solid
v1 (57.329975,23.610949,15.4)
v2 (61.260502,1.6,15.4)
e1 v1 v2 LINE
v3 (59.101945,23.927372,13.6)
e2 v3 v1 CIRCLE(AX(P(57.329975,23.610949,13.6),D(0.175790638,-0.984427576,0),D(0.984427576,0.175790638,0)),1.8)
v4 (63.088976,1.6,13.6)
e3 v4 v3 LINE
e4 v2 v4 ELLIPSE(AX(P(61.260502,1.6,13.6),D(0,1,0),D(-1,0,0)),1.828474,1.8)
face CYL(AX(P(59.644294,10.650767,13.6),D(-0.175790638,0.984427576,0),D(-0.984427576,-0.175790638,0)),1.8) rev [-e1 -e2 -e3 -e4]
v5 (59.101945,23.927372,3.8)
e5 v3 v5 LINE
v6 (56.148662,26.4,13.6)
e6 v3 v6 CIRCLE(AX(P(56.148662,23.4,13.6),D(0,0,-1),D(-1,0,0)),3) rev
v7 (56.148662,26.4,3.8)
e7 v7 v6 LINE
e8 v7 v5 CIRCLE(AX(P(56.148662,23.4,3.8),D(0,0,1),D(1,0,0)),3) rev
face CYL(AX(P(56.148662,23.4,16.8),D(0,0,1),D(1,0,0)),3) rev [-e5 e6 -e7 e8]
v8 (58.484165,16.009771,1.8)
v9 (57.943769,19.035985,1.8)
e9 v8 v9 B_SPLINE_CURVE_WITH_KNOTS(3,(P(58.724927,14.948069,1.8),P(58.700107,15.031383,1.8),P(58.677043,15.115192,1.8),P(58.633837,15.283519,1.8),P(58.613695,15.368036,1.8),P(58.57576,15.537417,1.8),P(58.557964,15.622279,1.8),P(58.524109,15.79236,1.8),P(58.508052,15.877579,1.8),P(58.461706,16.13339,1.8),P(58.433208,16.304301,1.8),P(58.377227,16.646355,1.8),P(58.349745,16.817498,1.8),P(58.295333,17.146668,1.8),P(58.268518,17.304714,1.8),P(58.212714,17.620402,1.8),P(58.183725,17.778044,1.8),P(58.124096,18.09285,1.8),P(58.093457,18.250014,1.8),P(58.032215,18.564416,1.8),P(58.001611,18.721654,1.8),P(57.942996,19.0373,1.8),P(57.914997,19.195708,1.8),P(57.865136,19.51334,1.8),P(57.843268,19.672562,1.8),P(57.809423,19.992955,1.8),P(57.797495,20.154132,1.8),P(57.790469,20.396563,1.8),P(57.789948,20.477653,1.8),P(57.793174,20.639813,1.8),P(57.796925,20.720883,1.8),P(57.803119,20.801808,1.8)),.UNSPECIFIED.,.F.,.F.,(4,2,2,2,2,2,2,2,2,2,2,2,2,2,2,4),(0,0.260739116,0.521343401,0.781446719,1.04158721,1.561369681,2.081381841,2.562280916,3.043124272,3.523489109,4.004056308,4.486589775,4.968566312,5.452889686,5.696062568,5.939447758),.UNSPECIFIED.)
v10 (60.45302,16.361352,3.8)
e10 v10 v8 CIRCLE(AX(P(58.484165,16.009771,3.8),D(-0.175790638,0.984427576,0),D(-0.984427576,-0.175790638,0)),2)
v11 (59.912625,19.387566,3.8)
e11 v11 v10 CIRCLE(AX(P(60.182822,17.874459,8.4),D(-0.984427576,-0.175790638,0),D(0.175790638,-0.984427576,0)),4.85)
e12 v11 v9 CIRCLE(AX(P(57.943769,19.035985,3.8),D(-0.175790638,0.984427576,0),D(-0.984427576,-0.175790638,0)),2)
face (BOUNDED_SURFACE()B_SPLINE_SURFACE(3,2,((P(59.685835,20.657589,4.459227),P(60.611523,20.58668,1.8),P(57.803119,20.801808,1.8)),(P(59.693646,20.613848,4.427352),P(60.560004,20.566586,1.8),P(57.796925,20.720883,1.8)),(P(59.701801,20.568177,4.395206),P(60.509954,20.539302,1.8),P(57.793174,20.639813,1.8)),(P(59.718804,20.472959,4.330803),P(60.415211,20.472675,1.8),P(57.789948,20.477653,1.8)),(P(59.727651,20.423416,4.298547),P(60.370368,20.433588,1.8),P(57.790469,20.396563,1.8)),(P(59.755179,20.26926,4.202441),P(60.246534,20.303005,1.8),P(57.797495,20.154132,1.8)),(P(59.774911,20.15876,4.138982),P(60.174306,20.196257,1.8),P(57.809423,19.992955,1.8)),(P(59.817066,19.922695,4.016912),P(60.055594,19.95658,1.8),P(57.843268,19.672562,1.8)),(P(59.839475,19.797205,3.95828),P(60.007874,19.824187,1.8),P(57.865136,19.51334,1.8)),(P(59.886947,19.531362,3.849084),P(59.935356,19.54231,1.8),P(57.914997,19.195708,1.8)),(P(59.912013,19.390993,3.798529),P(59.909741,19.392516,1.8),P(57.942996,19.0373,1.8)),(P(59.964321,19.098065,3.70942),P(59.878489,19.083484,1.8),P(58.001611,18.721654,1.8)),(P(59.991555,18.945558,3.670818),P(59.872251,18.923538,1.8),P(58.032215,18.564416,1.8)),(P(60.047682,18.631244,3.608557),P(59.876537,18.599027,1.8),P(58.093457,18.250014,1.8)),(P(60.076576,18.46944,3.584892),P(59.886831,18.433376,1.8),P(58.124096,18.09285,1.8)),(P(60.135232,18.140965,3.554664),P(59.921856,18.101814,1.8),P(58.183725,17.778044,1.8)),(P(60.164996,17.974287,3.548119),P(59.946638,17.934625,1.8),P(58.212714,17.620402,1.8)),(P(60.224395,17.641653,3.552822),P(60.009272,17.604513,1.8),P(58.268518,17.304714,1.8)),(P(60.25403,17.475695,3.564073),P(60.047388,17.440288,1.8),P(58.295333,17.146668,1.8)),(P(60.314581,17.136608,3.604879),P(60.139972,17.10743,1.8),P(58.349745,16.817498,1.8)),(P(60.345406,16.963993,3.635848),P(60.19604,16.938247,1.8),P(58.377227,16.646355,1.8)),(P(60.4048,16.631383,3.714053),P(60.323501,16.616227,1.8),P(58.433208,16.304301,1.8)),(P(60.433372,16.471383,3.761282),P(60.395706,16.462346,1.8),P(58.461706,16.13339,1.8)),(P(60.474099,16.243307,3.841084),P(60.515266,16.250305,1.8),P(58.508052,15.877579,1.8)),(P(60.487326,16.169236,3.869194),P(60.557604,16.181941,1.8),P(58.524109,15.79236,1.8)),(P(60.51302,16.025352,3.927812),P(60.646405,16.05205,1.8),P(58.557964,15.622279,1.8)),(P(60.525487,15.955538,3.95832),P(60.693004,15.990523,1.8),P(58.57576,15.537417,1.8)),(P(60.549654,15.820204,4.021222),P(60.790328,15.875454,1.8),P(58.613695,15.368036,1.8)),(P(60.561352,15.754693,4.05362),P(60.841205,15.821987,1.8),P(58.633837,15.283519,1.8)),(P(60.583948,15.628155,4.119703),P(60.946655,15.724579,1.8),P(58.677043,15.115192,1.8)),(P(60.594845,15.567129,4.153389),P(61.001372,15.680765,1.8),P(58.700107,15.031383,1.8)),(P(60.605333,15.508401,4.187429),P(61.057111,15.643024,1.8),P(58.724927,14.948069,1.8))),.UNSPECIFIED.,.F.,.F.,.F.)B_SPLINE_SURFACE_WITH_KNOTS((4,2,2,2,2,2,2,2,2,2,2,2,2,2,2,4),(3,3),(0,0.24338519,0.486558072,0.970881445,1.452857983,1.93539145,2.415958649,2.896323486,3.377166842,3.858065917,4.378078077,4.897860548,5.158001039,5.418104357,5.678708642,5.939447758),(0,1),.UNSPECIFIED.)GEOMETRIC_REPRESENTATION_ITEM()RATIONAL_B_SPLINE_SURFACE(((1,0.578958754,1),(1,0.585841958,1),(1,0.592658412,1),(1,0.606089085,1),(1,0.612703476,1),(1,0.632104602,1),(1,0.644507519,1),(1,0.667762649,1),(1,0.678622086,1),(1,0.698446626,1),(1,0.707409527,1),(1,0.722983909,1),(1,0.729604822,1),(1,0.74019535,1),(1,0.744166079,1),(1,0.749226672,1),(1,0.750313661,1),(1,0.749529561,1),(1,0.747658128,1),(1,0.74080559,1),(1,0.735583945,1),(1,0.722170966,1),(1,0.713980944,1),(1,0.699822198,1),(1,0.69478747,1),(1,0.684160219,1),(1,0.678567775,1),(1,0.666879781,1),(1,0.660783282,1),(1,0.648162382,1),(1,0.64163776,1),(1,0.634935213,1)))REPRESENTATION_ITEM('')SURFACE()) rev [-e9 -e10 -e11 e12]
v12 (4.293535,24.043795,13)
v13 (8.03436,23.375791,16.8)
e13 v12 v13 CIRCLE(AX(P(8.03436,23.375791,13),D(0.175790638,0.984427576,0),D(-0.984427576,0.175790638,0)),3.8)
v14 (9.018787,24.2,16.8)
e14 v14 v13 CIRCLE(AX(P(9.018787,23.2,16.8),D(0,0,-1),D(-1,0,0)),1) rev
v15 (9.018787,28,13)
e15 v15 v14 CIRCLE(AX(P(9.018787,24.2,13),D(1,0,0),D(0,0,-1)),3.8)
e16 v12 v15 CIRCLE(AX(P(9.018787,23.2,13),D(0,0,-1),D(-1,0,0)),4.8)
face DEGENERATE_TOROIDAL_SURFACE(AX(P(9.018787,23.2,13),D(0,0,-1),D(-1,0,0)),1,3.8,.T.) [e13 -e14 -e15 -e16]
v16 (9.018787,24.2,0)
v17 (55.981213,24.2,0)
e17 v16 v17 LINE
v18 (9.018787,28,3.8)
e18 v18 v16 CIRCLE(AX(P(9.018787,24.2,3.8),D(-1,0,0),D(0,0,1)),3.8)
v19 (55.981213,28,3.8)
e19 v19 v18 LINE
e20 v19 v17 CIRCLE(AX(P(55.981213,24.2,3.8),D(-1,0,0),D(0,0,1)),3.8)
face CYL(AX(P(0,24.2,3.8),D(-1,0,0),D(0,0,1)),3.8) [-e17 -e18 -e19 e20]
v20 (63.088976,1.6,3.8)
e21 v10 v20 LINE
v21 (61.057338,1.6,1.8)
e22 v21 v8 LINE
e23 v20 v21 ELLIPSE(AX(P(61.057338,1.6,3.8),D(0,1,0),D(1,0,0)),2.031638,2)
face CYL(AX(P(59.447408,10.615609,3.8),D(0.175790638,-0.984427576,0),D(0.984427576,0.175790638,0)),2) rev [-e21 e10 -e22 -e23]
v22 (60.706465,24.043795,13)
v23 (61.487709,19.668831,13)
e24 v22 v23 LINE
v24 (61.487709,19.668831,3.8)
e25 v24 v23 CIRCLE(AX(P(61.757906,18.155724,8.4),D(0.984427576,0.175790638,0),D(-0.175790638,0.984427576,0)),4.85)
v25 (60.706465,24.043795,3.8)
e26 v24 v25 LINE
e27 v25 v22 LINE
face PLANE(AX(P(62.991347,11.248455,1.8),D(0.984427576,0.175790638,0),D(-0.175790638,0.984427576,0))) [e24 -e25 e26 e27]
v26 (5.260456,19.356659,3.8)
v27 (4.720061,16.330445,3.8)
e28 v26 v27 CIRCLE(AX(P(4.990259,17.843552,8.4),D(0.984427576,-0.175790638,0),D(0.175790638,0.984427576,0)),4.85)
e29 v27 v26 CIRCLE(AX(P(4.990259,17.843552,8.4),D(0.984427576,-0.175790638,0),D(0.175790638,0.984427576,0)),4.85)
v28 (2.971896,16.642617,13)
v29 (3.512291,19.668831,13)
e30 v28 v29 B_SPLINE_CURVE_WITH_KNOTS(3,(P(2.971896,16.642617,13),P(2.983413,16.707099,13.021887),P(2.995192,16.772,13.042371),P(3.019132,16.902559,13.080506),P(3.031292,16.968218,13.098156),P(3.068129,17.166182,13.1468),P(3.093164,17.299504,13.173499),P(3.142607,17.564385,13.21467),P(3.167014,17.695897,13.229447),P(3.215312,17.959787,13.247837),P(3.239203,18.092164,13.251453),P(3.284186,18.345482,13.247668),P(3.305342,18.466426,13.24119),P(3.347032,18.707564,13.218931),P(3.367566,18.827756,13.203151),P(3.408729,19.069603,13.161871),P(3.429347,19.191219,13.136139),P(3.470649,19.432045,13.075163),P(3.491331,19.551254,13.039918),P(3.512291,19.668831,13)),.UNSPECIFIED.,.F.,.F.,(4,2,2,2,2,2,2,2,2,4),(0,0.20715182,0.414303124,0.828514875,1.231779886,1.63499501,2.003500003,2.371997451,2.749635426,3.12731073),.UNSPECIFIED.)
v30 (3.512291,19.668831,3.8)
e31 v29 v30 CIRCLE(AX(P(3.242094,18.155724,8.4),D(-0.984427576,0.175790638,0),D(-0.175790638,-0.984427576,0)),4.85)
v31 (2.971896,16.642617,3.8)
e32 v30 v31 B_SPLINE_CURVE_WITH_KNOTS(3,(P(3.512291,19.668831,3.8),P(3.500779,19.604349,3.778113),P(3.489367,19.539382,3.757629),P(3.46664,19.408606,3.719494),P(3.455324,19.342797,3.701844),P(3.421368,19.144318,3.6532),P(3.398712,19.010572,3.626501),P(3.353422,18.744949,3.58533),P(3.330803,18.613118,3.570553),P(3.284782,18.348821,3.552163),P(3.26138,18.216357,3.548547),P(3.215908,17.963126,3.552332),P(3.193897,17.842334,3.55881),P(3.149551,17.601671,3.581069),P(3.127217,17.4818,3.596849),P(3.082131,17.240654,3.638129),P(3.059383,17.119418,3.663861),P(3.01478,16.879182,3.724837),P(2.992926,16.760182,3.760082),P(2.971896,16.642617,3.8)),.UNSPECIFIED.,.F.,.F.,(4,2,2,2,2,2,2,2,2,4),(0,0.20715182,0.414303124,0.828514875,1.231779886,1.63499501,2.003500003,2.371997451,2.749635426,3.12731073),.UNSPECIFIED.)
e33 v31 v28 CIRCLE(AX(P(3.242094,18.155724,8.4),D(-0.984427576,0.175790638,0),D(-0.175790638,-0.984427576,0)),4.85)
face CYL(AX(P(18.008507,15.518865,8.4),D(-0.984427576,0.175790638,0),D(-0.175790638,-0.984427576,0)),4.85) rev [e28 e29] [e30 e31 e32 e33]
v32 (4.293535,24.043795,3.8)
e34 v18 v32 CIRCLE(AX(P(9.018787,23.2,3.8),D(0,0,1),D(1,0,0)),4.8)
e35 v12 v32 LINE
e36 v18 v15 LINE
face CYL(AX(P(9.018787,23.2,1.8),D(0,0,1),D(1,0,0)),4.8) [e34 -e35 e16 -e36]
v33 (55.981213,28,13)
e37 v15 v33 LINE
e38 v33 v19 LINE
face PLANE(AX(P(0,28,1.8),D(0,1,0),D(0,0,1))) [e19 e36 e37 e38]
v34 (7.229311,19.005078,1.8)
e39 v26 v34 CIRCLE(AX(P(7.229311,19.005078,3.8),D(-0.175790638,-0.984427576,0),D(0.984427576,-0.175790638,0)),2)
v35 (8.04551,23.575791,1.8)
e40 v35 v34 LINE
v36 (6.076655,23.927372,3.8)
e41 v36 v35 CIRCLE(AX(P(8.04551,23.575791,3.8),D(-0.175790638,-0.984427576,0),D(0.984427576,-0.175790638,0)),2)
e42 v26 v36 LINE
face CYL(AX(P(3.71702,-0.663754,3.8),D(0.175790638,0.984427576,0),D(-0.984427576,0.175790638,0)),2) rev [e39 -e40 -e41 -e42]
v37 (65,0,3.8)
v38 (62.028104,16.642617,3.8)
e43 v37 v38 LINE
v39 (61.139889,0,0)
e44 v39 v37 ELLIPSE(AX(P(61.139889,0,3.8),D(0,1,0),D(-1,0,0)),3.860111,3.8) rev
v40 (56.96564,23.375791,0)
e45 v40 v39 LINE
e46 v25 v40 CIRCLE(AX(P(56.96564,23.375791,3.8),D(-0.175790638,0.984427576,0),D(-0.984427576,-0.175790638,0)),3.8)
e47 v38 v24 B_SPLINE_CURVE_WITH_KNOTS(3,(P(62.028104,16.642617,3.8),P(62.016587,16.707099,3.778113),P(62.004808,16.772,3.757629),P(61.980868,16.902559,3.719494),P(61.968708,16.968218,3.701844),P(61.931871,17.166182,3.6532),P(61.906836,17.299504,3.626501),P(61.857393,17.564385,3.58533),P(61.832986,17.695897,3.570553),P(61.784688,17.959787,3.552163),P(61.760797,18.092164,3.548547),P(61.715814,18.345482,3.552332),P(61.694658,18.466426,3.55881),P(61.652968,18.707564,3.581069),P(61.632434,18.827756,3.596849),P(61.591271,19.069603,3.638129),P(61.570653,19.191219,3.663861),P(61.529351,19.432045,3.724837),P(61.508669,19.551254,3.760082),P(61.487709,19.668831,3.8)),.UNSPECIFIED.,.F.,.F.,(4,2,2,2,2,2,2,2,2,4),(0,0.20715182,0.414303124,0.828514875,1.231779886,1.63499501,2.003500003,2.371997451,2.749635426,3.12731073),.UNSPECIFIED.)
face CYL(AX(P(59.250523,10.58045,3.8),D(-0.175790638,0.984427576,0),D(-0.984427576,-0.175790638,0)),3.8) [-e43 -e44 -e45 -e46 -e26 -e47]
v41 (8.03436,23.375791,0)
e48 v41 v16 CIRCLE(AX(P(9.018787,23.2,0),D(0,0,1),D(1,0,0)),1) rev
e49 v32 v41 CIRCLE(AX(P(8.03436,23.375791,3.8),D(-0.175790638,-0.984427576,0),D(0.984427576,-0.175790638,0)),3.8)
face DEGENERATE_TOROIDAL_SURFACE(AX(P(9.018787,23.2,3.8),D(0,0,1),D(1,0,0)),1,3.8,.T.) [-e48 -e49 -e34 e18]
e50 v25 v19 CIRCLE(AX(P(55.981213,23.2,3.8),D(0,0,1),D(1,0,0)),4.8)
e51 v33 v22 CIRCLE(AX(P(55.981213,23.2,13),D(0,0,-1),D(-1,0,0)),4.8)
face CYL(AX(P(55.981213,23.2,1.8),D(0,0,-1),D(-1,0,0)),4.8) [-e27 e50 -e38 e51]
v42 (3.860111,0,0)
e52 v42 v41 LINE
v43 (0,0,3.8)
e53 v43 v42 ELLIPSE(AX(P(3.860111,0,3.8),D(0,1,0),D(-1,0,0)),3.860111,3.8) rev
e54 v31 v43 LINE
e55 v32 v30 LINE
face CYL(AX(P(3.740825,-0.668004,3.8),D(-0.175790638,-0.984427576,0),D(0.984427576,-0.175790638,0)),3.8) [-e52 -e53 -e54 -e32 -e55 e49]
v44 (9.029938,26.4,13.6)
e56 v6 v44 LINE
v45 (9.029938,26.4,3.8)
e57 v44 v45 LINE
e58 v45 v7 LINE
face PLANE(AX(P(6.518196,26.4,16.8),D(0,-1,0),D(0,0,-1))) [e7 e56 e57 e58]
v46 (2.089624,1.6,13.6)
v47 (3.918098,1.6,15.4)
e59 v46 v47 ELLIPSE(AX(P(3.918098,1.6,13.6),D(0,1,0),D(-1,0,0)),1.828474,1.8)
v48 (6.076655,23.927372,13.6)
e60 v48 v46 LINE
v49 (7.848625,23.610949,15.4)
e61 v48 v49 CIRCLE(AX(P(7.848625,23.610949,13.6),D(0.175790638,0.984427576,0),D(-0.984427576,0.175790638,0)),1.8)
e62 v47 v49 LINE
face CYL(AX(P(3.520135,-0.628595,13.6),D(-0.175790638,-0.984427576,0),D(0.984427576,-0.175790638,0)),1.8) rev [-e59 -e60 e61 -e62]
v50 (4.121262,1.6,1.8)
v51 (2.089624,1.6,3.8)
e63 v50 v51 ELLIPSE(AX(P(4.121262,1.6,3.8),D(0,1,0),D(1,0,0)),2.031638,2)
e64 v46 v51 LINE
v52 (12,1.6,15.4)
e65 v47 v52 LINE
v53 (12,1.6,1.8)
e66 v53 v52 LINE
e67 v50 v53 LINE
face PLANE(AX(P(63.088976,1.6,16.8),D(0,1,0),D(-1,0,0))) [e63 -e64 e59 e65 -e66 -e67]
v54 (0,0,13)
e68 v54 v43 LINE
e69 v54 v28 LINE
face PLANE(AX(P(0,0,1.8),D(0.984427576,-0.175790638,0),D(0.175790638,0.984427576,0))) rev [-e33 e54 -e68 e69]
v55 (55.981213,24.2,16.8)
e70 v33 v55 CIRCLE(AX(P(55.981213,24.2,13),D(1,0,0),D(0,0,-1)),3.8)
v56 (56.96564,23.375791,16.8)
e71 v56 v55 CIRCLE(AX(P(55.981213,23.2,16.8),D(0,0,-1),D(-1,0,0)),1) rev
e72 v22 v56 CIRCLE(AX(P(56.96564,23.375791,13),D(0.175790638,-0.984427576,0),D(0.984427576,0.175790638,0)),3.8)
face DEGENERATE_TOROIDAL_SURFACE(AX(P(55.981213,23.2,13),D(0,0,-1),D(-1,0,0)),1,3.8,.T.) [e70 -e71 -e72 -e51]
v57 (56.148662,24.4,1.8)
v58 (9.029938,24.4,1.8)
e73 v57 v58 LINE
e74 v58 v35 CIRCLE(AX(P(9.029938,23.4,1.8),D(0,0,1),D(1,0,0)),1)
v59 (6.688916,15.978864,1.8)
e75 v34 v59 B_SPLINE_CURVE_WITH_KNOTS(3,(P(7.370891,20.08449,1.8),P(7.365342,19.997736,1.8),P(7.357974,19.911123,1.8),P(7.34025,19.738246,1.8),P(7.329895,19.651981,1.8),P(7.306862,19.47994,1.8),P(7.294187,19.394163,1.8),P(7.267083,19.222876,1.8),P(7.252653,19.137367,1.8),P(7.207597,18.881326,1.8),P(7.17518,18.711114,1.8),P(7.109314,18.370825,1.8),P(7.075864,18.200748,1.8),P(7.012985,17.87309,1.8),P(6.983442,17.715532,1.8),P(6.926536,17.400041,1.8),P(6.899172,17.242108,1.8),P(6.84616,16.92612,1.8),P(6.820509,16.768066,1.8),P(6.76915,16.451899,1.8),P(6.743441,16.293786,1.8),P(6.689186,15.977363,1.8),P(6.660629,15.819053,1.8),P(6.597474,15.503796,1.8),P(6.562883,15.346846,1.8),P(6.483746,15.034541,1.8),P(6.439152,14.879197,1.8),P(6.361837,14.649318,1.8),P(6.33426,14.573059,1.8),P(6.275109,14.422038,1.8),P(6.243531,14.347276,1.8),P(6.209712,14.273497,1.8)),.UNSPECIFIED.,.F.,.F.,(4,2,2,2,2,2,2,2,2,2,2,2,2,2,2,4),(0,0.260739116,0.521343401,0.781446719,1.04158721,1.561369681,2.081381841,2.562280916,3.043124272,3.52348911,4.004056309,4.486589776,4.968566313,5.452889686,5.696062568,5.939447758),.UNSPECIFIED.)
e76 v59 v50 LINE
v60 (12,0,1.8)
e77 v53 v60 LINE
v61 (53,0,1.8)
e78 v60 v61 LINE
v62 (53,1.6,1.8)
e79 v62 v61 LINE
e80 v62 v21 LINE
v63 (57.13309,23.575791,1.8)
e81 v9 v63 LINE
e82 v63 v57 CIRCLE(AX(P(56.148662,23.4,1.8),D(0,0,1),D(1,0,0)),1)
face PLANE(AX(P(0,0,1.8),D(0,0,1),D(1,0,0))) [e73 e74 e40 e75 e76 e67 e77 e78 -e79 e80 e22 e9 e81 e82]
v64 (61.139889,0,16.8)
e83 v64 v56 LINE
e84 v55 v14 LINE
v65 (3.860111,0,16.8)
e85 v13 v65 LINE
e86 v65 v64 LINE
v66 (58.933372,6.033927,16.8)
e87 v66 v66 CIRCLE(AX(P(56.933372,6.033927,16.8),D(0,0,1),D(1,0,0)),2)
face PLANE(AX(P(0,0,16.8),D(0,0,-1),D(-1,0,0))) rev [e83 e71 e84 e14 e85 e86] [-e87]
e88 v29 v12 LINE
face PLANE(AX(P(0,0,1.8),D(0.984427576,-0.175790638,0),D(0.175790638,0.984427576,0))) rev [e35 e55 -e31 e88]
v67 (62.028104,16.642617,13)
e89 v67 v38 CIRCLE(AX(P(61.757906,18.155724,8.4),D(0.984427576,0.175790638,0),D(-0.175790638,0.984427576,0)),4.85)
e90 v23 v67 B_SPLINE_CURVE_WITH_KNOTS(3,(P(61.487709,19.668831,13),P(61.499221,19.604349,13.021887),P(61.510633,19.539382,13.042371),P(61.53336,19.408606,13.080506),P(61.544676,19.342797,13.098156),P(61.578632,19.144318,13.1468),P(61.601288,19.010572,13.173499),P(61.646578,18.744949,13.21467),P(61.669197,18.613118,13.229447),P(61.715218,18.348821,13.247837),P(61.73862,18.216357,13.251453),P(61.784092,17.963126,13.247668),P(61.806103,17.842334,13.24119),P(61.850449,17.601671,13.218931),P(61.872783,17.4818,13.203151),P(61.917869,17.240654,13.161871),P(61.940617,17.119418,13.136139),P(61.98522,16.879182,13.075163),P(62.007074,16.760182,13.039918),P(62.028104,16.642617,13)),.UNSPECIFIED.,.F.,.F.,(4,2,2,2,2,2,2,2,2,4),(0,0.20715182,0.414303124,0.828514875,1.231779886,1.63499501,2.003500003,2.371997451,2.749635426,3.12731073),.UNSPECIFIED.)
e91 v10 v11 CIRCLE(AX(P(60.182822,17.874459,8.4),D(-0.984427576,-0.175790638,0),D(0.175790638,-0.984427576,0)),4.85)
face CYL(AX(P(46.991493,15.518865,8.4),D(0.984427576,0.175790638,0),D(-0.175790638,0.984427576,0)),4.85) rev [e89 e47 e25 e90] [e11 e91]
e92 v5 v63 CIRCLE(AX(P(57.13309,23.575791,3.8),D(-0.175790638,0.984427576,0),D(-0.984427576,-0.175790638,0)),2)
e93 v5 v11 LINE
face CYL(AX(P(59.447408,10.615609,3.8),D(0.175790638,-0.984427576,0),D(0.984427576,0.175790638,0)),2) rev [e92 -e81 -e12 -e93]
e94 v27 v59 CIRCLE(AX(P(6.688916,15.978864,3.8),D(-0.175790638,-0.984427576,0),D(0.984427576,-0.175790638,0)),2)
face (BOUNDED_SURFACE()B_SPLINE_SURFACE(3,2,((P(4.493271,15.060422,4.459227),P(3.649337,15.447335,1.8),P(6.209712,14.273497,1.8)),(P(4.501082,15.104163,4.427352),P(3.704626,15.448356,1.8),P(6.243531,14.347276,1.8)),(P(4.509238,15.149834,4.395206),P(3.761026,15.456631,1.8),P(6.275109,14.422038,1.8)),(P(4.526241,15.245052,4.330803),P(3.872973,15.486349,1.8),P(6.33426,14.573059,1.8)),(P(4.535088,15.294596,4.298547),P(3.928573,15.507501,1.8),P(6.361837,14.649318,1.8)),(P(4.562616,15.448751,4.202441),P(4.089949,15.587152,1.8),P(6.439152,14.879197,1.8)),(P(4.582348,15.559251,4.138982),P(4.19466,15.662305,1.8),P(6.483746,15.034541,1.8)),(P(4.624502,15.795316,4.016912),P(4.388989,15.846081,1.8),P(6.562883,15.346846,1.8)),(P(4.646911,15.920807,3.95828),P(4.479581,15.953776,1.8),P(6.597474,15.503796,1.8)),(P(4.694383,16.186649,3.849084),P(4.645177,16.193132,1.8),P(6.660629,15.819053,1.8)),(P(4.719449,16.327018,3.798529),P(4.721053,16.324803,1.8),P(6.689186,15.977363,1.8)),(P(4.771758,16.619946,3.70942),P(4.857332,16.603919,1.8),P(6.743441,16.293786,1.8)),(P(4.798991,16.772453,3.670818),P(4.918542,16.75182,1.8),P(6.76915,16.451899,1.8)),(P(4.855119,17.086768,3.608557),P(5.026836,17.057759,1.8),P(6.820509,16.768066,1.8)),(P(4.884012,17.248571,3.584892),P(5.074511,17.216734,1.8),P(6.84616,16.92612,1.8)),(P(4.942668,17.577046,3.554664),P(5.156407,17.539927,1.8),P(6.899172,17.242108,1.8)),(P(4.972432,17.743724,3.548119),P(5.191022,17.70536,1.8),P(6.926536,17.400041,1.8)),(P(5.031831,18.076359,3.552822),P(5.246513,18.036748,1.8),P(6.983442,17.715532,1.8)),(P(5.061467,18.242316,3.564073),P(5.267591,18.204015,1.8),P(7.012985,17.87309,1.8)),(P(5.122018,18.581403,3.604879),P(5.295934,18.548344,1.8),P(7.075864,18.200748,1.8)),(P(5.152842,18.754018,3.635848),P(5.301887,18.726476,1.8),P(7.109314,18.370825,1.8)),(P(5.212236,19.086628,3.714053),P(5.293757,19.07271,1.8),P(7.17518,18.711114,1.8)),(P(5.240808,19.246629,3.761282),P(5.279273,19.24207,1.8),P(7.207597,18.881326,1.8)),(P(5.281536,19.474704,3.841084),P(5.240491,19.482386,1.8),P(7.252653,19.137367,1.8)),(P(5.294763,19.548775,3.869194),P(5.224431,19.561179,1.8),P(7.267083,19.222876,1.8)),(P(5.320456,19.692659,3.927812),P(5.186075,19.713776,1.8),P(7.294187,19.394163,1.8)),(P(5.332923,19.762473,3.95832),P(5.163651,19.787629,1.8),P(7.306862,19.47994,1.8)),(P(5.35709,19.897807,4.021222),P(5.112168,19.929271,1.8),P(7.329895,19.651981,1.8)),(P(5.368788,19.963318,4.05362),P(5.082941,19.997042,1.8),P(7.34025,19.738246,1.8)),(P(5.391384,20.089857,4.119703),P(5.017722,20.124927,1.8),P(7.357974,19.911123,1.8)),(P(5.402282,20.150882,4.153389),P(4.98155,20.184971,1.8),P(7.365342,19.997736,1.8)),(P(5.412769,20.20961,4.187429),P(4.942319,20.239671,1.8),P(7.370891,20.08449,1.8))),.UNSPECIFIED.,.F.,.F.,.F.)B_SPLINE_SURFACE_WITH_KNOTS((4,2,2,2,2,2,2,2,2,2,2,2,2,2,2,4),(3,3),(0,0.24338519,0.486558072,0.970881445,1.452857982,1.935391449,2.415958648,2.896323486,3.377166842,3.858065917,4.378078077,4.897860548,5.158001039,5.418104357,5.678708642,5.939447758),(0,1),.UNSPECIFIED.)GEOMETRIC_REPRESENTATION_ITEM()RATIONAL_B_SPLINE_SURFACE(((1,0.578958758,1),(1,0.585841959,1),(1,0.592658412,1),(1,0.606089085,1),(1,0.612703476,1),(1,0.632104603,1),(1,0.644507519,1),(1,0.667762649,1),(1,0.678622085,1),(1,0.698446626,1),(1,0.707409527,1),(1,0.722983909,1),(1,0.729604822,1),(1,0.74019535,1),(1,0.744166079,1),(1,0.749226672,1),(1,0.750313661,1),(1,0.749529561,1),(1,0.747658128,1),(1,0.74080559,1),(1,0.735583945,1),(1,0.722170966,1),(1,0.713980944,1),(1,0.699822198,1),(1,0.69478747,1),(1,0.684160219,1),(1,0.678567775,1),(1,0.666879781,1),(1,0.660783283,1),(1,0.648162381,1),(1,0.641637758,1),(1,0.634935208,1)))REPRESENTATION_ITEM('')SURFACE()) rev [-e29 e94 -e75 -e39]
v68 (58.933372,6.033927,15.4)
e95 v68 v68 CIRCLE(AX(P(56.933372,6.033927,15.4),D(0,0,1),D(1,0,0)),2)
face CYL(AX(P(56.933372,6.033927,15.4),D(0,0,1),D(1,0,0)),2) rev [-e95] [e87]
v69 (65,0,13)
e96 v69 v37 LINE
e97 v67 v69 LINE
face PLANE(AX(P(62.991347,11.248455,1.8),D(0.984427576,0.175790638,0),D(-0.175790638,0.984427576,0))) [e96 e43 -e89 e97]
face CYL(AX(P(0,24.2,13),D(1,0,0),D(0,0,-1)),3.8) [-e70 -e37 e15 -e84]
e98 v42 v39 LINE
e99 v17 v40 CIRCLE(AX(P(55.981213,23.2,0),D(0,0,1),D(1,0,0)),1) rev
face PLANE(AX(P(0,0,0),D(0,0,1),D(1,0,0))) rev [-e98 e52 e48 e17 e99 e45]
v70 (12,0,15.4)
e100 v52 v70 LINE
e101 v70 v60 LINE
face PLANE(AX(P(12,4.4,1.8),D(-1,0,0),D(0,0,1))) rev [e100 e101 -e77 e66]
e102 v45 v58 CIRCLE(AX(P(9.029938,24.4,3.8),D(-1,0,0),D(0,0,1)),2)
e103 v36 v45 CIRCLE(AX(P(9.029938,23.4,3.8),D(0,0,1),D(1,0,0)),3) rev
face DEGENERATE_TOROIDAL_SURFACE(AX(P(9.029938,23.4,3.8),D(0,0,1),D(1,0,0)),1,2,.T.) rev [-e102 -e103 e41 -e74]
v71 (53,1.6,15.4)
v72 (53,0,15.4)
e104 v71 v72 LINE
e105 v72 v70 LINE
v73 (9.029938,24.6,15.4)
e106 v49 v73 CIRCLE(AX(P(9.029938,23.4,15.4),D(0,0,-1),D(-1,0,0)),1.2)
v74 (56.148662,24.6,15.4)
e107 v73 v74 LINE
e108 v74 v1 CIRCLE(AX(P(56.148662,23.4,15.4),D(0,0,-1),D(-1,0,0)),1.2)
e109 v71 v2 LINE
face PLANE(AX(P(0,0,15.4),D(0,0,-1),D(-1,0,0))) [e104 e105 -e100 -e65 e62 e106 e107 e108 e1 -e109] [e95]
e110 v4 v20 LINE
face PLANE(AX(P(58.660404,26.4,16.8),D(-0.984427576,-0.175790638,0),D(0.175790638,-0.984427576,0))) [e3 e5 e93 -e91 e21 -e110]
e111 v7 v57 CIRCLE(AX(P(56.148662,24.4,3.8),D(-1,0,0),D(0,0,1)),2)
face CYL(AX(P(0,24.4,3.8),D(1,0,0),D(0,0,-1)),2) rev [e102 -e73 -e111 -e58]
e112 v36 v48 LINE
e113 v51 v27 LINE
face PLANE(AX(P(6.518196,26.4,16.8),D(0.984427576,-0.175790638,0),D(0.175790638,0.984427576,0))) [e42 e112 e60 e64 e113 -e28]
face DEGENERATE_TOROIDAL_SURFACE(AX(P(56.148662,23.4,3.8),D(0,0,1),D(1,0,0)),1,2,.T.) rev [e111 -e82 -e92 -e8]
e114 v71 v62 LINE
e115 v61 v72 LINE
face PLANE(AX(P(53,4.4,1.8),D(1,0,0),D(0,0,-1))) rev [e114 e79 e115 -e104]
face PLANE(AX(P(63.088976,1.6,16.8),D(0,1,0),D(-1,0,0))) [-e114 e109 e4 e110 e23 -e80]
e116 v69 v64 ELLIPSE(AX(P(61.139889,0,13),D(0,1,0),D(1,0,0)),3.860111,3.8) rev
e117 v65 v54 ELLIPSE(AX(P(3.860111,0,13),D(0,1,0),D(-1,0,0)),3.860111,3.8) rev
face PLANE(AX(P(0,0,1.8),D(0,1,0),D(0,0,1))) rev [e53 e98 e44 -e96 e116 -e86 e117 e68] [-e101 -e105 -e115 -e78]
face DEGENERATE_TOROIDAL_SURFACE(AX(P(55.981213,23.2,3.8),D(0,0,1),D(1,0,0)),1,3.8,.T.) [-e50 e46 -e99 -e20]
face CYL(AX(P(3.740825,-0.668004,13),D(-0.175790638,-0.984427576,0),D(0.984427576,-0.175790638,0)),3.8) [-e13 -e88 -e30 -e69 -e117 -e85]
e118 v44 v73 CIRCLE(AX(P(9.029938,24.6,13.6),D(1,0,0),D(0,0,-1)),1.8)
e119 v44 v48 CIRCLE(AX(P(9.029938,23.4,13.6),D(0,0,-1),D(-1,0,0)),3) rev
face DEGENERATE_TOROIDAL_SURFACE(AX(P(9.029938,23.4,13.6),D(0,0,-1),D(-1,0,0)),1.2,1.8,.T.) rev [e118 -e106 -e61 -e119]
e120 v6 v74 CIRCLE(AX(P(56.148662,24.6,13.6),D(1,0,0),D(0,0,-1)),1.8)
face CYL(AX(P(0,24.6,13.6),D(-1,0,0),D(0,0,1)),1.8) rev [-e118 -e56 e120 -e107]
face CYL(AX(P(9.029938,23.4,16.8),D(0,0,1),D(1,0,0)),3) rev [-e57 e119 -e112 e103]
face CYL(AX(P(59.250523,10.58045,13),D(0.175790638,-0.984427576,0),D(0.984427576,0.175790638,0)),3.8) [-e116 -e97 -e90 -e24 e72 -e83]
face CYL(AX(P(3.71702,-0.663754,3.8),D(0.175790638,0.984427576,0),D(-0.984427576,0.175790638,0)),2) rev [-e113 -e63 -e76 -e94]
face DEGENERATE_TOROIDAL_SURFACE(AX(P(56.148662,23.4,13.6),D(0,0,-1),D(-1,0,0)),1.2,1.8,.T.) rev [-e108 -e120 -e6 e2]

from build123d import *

# Parameters (mm, degrees)
BOSS_EXTRUDE1_DEPTH = 1.8
BOSS_EXTRUDE2_DEPTH = 15
SKETCH3_R           = 4.85
CUT_EXTRUDE1_DEPTH  = 15
SKETCH4_R           = 4.85
CUT_EXTRUDE2_DEPTH  = 15
FILLET1_R           = 3
FILLET2_R           = 4.8
FILLET3_R           = 2
FILLET4_R           = 3.8
BOSS_EXTRUDE3_DEPTH = 1.4
SKETCH6_R           = 2
CUT_EXTRUDE3_DEPTH  = 1.4
BOSS_EXTRUDE4_DEPTH = 1.4
SKETCH8_W           = 41
SKETCH8_H           = 13.6
CUT_EXTRUDE4_DEPTH  = 4.4
FILLET5_R           = 1.8
FILLET6_R           = 3.8


with BuildPart() as part:
    # Sketch1 → Boss-Extrude1 (new body)
    with BuildSketch(Plane.XY):
        Polygon((0, 0), (65, 0), (60, 28), (5, 28), align=None)
    extrude(amount=BOSS_EXTRUDE1_DEPTH)

    # Sketch2 → Boss-Extrude2 (add)
    with BuildSketch(Plane.XY.offset(1.8)):
        Polygon((5, 28), (60, 28), (65, 0), (0, 0), align=None)
        Polygon((6.518195748, 26.4), (58.660404268, 26.4), (63.088975697, 1.6), (2.08962432, 1.6), align=None, mode=Mode.SUBTRACT)
    extrude(amount=BOSS_EXTRUDE2_DEPTH)

    # Sketch3 → Cut-Extrude1 (cut)
    with BuildSketch(Plane(origin=(62.991347342, 11.248454883, 0), x_dir=(0, 0, -1), z_dir=(0.9844275755084821, 0.17579063848365745, 0))):
        with Locations(Location((-8.4, 7.016533805, 0), (0, 0, 90))):
            Circle(SKETCH3_R)
    extrude(amount=-CUT_EXTRUDE1_DEPTH, mode=Mode.SUBTRACT)

    # Sketch4 → Cut-Extrude2 (cut)
    with BuildSketch(Plane(origin=(0, 0, 0), x_dir=(0, 0, 1), z_dir=(-0.9844275755084821, 0.17579063848365759, 0))):
        with Locations(Location((8.4, 18.442925307, 0), (0, 0, 270))):
            Circle(SKETCH4_R)
    extrude(amount=-CUT_EXTRUDE2_DEPTH, mode=Mode.SUBTRACT)

    # Fillet1
    fillet1_edges = [part.edges().sort_by_distance(p)[0] for p in [
        (58.660404268, 26.4, 9.3),
        (6.518195748, 26.4, 9.3),
    ]]
    fillet(fillet1_edges, radius=FILLET1_R)

    # Fillet2
    fillet2_edges = [part.edges().sort_by_distance(p)[0] for p in [
        (5, 28, 8.4),
        (60, 28, 8.4),
    ]]
    fillet(fillet2_edges, radius=FILLET2_R)

    # Fillet3
    fillet3_edges = [part.edges().sort_by_distance(p)[0] for p in [
        (61.095460347, 12.763685958, 1.8),
        (32.589300008, 26.4, 1.8),
        (4.083139669, 12.763685958, 1.8),
        (58.07452367, 25.700229961, 1.8),
        (7.104076347, 25.700229961, 1.8),
    ]]
    fillet(fillet3_edges, radius=FILLET3_R)

    # Fillet4
    # the kernel refuses this fillet: 3.8 mm, written as the material it takes off along each edge
    with BuildSketch(Plane(origin=(55.981212805, 28, 0), x_dir=(0, 0, 1), z_dir=(-1, 0, 0))) as fillet4_piece_1:
        with BuildLine():
            CenterArc((FILLET4_R, -FILLET4_R), FILLET4_R, 90, 90)
            Line((0, -FILLET4_R), (0, 0))
            Line((0, 0), (FILLET4_R, 0))
        make_face()
    extrude(amount=46.962425609, mode=Mode.SUBTRACT)
    with BuildSketch(Plane(origin=(66.670011066, -9.352061967, 0), x_dir=(0, 0, 1), z_dir=(-0.17579063848365728, 0.9844275755084821, 0)), Plane(origin=(4.293534833, 24.043795065, 0), x_dir=(0, 0, 1), z_dir=(-0.17579063848365753, -0.984427575508482, 0))) as fillet4_piece_2:
        with BuildLine():
            CenterArc((FILLET4_R, -FILLET4_R), FILLET4_R, 90, 90)
            Line((0, -FILLET4_R), (0, 0))
            Line((0, 0), (FILLET4_R, 0))
        make_face()
    extrude(amount=33.924138111, mode=Mode.SUBTRACT)
    with BuildSketch(Plane(origin=(9.018787195, 23.2, 0), x_dir=(0, 1, 0), z_dir=(1, 0, 0))) as fillet4_piece_3:
        with BuildLine():
            CenterArc((4.8 - FILLET4_R, FILLET4_R), FILLET4_R, 270, 90)
            Line((4.8 - FILLET4_R, 0), (4.8, 0))
            Line((4.8, 0), (4.8, FILLET4_R))
        make_face()
    revolve(axis=Axis((9.018787195, 23.2, 0), (0, 0, 1)), revolution_arc=79.875328345, mode=Mode.SUBTRACT)
    with BuildSketch(Plane(origin=(55.981212805, 23.2, 0), x_dir=(0, 1, 0), z_dir=(-1, 0, 0))) as fillet4_piece_4:
        with BuildLine():
            CenterArc((4.8 - FILLET4_R, -FILLET4_R), FILLET4_R, 0, 90)
            Line((4.8 - FILLET4_R, 0), (4.8, 0))
            Line((4.8, 0), (4.8, -FILLET4_R))
        make_face()
    revolve(axis=Axis((55.981212805, 23.2, 0), (0, 0, -1)), revolution_arc=79.875328345, mode=Mode.SUBTRACT)

    # Sketch5 → Boss-Extrude3 (add)
    with BuildSketch(Plane.XY.offset(16.8)):
        Polygon((2.08962432, 1.6), (62.853232584, 1.6), (63.866257319, 1.6), (62.171786683, 12.021897532), (3.201344626, 12.021897532), (1.273741814, 1.6), align=None)
    extrude(amount=-BOSS_EXTRUDE3_DEPTH)

    # Sketch6 → Cut-Extrude3 (cut)
    with BuildSketch(Plane.XY.offset(16.8)):
        with Locations((56.933372232, 6.033926522)):
            Circle(SKETCH6_R)
    extrude(amount=-CUT_EXTRUDE3_DEPTH, mode=Mode.SUBTRACT)

    # Sketch7 → Boss-Extrude4 (add)
    with BuildSketch(Plane.XY.offset(16.8)):
        Polygon((6.155527083, 26.711603316), (3.95067745, 17.333364545), (3.95067745, 12.021897532), (61.507859388, 12.021897532), (61.507859388, 17.333364545), (58.93189058, 26.711603316), align=None)
    extrude(amount=-BOSS_EXTRUDE4_DEPTH)

    # Sketch8 → Cut-Extrude4 (cut)
    with BuildSketch(Plane(origin=(0, 0, 0), x_dir=(-1, 0, 0), z_dir=(0, -1, 0))):
        with Locations((-32.5, -8.6)):
            Rectangle(SKETCH8_W, SKETCH8_H)
    extrude(amount=-CUT_EXTRUDE4_DEPTH, mode=Mode.SUBTRACT)

    # Fillet5
    fillet5_edges = [part.edges().sort_by_distance(p)[0] for p in [
        (61.095460347, 12.763685958, 15.4),
        (4.083139669, 12.763685958, 15.4),
        (58.07452367, 25.700229961, 15.4),
        (7.104076347, 25.700229961, 15.4),
        (32.589300008, 26.4, 15.4),
    ]]
    fillet(fillet5_edges, radius=FILLET5_R)

    # Fillet6
    # the kernel refuses this fillet: 3.8 mm, written as the material it takes off along each edge
    with BuildSketch(Plane(origin=(60.706465167, 24.043795065, 16.8), x_dir=(-0.984427575508482, -0.17579063848365725, 0), z_dir=(0.17579063848365728, -0.9844275755084821, 0))) as fillet6_piece_1:
        with BuildLine():
            CenterArc((FILLET6_R, FILLET6_R), FILLET6_R, 180, 90)
            Line((0, FILLET6_R), (0, 0))
            Line((0, 0), (FILLET6_R, 0))
        make_face()
    extrude(amount=33.924138111, mode=Mode.SUBTRACT)
    with BuildSketch(Plane(origin=(9.018787195, 28, 16.8), x_dir=(0, -1, 0), z_dir=(1, 0, 0))) as fillet6_piece_2:
        with BuildLine():
            CenterArc((FILLET6_R, FILLET6_R), FILLET6_R, 180, 90)
            Line((0, FILLET6_R), (0, 0))
            Line((0, 0), (FILLET6_R, 0))
        make_face()
    extrude(amount=46.962425609, mode=Mode.SUBTRACT)
    with BuildSketch(Plane(origin=(-1.670011066, -9.352061967, 16.8), x_dir=(0, 0, -1), z_dir=(0.17579063848365753, 0.984427575508482, 0))) as fillet6_piece_3:
        with BuildLine():
            CenterArc((FILLET6_R, -FILLET6_R), FILLET6_R, 90, 90)
            Line((0, -FILLET6_R), (0, 0))
            Line((0, 0), (FILLET6_R, 0))
        make_face()
    extrude(amount=33.924138111, mode=Mode.SUBTRACT)
    with BuildSketch(Plane(origin=(9.018787195, 23.2, 16.8), x_dir=(0, 1, 0), z_dir=(1, 0, 0))) as fillet6_piece_4:
        with BuildLine():
            CenterArc((4.8 - FILLET6_R, -FILLET6_R), FILLET6_R, 0, 90)
            Line((4.8 - FILLET6_R, 0), (4.8, 0))
            Line((4.8, 0), (4.8, -FILLET6_R))
        make_face()
    revolve(axis=Axis((9.018787195, 23.2, 16.8), (0, 0, 1)), revolution_arc=79.875328345, mode=Mode.SUBTRACT)
    with BuildSketch(Plane(origin=(55.981212805, 23.2, 16.8), x_dir=(0, 1, 0), z_dir=(-1, 0, 0))) as fillet6_piece_5:
        with BuildLine():
            CenterArc((4.8 - FILLET6_R, FILLET6_R), FILLET6_R, 270, 90)
            Line((4.8, FILLET6_R), (4.8, 0))
            Line((4.8, 0), (4.8 - FILLET6_R, 0))
        make_face()
    revolve(axis=Axis((55.981212805, 23.2, 16.8), (0, 0, -1)), revolution_arc=79.875328345, mode=Mode.SUBTRACT)


solid = part.part
